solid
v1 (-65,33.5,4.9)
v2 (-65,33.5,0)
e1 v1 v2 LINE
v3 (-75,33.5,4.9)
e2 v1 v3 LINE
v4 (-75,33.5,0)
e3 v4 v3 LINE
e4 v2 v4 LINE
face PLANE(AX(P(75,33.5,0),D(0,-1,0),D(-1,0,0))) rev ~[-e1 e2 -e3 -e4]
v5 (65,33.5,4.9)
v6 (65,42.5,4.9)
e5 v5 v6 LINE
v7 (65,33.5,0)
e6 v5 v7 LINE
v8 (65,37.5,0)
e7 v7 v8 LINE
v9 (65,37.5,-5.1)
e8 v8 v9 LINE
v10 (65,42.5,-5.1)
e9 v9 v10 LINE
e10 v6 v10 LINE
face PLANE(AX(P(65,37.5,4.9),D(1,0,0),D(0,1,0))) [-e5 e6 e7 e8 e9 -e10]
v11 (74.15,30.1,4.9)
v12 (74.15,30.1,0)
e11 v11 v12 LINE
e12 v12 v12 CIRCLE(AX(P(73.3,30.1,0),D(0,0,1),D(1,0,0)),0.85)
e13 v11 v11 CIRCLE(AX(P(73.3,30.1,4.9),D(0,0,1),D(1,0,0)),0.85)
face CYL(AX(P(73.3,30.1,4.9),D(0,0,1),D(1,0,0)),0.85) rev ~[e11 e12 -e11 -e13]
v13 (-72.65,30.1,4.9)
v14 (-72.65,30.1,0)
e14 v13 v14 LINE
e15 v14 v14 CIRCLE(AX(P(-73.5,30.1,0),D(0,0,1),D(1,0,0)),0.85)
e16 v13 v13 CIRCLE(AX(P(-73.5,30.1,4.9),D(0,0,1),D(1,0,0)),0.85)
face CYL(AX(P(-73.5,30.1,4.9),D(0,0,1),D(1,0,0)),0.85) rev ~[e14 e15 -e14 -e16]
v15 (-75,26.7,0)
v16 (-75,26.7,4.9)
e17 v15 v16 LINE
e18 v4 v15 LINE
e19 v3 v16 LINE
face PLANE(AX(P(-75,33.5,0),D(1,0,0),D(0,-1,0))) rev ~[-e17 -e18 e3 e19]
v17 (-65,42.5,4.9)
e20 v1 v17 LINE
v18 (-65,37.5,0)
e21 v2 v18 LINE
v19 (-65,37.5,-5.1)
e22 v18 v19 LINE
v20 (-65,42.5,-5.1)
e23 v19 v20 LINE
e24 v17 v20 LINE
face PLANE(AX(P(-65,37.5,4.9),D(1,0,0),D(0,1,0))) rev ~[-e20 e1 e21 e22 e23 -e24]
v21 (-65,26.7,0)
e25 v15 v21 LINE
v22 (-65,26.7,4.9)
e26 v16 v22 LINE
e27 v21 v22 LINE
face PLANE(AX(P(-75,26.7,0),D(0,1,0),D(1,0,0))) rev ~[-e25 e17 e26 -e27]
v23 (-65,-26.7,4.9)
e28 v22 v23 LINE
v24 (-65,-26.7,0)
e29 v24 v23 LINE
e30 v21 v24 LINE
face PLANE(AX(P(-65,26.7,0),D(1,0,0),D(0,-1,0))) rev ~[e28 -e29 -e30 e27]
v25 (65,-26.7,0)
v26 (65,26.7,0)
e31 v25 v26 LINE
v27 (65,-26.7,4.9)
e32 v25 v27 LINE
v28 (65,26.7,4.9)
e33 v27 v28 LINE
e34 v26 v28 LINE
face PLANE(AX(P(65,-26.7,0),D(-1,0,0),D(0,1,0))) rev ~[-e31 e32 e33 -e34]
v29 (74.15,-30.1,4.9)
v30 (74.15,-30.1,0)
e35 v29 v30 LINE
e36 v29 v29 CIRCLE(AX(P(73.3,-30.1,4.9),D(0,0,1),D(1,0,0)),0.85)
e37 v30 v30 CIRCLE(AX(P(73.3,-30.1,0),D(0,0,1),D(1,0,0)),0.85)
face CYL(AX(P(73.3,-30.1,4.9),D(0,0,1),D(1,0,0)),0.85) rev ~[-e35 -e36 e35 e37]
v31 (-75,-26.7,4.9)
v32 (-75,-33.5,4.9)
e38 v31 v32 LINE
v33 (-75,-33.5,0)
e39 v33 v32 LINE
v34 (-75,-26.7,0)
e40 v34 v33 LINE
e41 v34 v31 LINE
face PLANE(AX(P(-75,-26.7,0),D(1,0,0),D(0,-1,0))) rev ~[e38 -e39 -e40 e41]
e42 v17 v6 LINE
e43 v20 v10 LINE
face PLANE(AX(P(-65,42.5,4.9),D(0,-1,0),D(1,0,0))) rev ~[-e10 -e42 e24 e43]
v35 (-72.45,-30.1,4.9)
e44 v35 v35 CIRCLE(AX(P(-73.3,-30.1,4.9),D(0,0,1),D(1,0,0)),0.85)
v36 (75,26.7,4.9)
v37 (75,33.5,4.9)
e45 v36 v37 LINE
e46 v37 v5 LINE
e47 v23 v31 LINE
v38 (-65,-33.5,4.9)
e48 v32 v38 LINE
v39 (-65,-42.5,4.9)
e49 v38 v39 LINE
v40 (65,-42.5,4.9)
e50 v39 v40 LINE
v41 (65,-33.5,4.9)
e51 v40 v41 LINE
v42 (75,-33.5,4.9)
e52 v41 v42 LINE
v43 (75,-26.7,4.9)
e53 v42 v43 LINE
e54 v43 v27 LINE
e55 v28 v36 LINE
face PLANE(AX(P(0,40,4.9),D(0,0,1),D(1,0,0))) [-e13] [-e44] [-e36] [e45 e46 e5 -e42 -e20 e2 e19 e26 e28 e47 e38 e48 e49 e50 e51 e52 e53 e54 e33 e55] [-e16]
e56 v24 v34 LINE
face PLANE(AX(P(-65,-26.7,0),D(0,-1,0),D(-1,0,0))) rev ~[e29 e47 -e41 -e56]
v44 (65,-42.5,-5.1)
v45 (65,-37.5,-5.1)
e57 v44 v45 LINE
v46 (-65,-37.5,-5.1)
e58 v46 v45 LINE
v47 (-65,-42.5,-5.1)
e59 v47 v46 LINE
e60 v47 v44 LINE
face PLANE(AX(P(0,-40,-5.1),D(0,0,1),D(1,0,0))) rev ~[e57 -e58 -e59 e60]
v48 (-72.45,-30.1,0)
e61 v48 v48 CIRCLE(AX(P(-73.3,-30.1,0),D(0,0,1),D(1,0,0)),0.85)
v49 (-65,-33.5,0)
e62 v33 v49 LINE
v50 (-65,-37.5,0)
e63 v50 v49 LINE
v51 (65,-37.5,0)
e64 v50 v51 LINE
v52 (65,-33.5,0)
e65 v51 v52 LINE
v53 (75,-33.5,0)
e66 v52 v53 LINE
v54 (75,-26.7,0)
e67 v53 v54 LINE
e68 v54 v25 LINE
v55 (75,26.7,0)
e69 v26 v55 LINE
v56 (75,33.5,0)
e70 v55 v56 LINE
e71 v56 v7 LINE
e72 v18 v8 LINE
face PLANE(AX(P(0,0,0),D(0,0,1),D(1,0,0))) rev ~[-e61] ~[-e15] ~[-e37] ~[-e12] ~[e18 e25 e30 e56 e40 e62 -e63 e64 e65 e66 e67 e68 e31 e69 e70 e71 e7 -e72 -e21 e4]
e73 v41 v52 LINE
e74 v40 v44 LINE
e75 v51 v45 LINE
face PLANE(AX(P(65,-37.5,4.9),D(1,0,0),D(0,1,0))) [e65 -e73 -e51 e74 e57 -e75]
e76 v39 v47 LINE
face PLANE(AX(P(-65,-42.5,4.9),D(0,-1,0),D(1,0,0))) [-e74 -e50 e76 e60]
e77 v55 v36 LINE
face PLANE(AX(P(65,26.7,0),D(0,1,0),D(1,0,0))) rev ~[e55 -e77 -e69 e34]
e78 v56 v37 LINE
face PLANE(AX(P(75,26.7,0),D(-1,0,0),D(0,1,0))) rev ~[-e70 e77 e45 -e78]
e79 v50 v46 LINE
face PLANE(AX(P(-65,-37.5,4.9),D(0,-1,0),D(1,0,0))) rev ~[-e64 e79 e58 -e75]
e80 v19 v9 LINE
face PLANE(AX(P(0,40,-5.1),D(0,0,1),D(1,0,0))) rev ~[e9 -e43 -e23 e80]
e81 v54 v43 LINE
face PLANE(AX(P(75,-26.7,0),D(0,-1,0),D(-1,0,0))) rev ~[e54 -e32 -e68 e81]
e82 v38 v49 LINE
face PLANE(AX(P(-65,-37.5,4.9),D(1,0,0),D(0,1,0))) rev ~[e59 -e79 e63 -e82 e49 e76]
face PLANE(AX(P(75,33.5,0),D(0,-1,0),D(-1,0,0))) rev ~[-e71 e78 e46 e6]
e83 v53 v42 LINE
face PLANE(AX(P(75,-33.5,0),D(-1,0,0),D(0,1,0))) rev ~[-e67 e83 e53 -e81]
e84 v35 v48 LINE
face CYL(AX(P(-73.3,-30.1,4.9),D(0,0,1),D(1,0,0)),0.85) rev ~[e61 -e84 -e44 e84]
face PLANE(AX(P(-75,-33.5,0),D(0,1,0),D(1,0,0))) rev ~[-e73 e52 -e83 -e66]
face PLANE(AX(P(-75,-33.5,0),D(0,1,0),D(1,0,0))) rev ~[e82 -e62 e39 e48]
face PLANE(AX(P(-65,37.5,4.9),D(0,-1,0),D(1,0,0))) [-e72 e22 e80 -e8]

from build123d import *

# Parameters (mm, degrees)
F1_DEPTH = 4.9
F2_R     = 0.85
F3_DEPTH = 4.901
F4_W     = 130
F4_H     = 4
F5_DEPTH = 4.9
F6_W     = 130
F6_H     = 5
F7_DEPTH = 10


with BuildPart() as f1:
    # F0 (on Top) → F1 (new body)
    with BuildSketch(Plane.XY):
        Polygon((-75, -33.5), (75, -33.5), (75, -26.7), (65, -26.7), (65, 26.7), (75, 26.7), (75, 33.5), (-75, 33.5), (-75, 26.7), (-65, 26.7), (-65, -26.7), (-75, -26.7), align=None)
    extrude(amount=F1_DEPTH)

    # F2 (on face) → F3 (cut, through all)
    with BuildSketch(Plane.XY.offset(4.9)):
        with Locations((-73.5, 30.1)):
            Circle(F2_R)
        with Locations((-73.3, -30.1)):
            Circle(F2_R)
        with Locations((73.3, 30.1)):
            Circle(F2_R)
        with Locations((73.3, -30.1)):
            Circle(F2_R)
    extrude(amount=-F3_DEPTH, mode=Mode.SUBTRACT)

    # F4 (on face) → F5 (join)
    with BuildSketch(Plane.XY.offset(4.9)):
        with Locations((0, 35.5)):
            Rectangle(F4_W, F4_H)
        with Locations((0, -35.5)):
            Rectangle(F4_W, F4_H)
    extrude(amount=-F5_DEPTH)

    # F6 (on face) → F7 (join)
    with BuildSketch(Plane.XY.offset(4.9)):
        with Locations((0, 40)):
            Rectangle(F6_W, F6_H)
        with Locations((0, -40)):
            Rectangle(F6_W, F6_H)
    extrude(amount=-F7_DEPTH)


solid = f1.part
